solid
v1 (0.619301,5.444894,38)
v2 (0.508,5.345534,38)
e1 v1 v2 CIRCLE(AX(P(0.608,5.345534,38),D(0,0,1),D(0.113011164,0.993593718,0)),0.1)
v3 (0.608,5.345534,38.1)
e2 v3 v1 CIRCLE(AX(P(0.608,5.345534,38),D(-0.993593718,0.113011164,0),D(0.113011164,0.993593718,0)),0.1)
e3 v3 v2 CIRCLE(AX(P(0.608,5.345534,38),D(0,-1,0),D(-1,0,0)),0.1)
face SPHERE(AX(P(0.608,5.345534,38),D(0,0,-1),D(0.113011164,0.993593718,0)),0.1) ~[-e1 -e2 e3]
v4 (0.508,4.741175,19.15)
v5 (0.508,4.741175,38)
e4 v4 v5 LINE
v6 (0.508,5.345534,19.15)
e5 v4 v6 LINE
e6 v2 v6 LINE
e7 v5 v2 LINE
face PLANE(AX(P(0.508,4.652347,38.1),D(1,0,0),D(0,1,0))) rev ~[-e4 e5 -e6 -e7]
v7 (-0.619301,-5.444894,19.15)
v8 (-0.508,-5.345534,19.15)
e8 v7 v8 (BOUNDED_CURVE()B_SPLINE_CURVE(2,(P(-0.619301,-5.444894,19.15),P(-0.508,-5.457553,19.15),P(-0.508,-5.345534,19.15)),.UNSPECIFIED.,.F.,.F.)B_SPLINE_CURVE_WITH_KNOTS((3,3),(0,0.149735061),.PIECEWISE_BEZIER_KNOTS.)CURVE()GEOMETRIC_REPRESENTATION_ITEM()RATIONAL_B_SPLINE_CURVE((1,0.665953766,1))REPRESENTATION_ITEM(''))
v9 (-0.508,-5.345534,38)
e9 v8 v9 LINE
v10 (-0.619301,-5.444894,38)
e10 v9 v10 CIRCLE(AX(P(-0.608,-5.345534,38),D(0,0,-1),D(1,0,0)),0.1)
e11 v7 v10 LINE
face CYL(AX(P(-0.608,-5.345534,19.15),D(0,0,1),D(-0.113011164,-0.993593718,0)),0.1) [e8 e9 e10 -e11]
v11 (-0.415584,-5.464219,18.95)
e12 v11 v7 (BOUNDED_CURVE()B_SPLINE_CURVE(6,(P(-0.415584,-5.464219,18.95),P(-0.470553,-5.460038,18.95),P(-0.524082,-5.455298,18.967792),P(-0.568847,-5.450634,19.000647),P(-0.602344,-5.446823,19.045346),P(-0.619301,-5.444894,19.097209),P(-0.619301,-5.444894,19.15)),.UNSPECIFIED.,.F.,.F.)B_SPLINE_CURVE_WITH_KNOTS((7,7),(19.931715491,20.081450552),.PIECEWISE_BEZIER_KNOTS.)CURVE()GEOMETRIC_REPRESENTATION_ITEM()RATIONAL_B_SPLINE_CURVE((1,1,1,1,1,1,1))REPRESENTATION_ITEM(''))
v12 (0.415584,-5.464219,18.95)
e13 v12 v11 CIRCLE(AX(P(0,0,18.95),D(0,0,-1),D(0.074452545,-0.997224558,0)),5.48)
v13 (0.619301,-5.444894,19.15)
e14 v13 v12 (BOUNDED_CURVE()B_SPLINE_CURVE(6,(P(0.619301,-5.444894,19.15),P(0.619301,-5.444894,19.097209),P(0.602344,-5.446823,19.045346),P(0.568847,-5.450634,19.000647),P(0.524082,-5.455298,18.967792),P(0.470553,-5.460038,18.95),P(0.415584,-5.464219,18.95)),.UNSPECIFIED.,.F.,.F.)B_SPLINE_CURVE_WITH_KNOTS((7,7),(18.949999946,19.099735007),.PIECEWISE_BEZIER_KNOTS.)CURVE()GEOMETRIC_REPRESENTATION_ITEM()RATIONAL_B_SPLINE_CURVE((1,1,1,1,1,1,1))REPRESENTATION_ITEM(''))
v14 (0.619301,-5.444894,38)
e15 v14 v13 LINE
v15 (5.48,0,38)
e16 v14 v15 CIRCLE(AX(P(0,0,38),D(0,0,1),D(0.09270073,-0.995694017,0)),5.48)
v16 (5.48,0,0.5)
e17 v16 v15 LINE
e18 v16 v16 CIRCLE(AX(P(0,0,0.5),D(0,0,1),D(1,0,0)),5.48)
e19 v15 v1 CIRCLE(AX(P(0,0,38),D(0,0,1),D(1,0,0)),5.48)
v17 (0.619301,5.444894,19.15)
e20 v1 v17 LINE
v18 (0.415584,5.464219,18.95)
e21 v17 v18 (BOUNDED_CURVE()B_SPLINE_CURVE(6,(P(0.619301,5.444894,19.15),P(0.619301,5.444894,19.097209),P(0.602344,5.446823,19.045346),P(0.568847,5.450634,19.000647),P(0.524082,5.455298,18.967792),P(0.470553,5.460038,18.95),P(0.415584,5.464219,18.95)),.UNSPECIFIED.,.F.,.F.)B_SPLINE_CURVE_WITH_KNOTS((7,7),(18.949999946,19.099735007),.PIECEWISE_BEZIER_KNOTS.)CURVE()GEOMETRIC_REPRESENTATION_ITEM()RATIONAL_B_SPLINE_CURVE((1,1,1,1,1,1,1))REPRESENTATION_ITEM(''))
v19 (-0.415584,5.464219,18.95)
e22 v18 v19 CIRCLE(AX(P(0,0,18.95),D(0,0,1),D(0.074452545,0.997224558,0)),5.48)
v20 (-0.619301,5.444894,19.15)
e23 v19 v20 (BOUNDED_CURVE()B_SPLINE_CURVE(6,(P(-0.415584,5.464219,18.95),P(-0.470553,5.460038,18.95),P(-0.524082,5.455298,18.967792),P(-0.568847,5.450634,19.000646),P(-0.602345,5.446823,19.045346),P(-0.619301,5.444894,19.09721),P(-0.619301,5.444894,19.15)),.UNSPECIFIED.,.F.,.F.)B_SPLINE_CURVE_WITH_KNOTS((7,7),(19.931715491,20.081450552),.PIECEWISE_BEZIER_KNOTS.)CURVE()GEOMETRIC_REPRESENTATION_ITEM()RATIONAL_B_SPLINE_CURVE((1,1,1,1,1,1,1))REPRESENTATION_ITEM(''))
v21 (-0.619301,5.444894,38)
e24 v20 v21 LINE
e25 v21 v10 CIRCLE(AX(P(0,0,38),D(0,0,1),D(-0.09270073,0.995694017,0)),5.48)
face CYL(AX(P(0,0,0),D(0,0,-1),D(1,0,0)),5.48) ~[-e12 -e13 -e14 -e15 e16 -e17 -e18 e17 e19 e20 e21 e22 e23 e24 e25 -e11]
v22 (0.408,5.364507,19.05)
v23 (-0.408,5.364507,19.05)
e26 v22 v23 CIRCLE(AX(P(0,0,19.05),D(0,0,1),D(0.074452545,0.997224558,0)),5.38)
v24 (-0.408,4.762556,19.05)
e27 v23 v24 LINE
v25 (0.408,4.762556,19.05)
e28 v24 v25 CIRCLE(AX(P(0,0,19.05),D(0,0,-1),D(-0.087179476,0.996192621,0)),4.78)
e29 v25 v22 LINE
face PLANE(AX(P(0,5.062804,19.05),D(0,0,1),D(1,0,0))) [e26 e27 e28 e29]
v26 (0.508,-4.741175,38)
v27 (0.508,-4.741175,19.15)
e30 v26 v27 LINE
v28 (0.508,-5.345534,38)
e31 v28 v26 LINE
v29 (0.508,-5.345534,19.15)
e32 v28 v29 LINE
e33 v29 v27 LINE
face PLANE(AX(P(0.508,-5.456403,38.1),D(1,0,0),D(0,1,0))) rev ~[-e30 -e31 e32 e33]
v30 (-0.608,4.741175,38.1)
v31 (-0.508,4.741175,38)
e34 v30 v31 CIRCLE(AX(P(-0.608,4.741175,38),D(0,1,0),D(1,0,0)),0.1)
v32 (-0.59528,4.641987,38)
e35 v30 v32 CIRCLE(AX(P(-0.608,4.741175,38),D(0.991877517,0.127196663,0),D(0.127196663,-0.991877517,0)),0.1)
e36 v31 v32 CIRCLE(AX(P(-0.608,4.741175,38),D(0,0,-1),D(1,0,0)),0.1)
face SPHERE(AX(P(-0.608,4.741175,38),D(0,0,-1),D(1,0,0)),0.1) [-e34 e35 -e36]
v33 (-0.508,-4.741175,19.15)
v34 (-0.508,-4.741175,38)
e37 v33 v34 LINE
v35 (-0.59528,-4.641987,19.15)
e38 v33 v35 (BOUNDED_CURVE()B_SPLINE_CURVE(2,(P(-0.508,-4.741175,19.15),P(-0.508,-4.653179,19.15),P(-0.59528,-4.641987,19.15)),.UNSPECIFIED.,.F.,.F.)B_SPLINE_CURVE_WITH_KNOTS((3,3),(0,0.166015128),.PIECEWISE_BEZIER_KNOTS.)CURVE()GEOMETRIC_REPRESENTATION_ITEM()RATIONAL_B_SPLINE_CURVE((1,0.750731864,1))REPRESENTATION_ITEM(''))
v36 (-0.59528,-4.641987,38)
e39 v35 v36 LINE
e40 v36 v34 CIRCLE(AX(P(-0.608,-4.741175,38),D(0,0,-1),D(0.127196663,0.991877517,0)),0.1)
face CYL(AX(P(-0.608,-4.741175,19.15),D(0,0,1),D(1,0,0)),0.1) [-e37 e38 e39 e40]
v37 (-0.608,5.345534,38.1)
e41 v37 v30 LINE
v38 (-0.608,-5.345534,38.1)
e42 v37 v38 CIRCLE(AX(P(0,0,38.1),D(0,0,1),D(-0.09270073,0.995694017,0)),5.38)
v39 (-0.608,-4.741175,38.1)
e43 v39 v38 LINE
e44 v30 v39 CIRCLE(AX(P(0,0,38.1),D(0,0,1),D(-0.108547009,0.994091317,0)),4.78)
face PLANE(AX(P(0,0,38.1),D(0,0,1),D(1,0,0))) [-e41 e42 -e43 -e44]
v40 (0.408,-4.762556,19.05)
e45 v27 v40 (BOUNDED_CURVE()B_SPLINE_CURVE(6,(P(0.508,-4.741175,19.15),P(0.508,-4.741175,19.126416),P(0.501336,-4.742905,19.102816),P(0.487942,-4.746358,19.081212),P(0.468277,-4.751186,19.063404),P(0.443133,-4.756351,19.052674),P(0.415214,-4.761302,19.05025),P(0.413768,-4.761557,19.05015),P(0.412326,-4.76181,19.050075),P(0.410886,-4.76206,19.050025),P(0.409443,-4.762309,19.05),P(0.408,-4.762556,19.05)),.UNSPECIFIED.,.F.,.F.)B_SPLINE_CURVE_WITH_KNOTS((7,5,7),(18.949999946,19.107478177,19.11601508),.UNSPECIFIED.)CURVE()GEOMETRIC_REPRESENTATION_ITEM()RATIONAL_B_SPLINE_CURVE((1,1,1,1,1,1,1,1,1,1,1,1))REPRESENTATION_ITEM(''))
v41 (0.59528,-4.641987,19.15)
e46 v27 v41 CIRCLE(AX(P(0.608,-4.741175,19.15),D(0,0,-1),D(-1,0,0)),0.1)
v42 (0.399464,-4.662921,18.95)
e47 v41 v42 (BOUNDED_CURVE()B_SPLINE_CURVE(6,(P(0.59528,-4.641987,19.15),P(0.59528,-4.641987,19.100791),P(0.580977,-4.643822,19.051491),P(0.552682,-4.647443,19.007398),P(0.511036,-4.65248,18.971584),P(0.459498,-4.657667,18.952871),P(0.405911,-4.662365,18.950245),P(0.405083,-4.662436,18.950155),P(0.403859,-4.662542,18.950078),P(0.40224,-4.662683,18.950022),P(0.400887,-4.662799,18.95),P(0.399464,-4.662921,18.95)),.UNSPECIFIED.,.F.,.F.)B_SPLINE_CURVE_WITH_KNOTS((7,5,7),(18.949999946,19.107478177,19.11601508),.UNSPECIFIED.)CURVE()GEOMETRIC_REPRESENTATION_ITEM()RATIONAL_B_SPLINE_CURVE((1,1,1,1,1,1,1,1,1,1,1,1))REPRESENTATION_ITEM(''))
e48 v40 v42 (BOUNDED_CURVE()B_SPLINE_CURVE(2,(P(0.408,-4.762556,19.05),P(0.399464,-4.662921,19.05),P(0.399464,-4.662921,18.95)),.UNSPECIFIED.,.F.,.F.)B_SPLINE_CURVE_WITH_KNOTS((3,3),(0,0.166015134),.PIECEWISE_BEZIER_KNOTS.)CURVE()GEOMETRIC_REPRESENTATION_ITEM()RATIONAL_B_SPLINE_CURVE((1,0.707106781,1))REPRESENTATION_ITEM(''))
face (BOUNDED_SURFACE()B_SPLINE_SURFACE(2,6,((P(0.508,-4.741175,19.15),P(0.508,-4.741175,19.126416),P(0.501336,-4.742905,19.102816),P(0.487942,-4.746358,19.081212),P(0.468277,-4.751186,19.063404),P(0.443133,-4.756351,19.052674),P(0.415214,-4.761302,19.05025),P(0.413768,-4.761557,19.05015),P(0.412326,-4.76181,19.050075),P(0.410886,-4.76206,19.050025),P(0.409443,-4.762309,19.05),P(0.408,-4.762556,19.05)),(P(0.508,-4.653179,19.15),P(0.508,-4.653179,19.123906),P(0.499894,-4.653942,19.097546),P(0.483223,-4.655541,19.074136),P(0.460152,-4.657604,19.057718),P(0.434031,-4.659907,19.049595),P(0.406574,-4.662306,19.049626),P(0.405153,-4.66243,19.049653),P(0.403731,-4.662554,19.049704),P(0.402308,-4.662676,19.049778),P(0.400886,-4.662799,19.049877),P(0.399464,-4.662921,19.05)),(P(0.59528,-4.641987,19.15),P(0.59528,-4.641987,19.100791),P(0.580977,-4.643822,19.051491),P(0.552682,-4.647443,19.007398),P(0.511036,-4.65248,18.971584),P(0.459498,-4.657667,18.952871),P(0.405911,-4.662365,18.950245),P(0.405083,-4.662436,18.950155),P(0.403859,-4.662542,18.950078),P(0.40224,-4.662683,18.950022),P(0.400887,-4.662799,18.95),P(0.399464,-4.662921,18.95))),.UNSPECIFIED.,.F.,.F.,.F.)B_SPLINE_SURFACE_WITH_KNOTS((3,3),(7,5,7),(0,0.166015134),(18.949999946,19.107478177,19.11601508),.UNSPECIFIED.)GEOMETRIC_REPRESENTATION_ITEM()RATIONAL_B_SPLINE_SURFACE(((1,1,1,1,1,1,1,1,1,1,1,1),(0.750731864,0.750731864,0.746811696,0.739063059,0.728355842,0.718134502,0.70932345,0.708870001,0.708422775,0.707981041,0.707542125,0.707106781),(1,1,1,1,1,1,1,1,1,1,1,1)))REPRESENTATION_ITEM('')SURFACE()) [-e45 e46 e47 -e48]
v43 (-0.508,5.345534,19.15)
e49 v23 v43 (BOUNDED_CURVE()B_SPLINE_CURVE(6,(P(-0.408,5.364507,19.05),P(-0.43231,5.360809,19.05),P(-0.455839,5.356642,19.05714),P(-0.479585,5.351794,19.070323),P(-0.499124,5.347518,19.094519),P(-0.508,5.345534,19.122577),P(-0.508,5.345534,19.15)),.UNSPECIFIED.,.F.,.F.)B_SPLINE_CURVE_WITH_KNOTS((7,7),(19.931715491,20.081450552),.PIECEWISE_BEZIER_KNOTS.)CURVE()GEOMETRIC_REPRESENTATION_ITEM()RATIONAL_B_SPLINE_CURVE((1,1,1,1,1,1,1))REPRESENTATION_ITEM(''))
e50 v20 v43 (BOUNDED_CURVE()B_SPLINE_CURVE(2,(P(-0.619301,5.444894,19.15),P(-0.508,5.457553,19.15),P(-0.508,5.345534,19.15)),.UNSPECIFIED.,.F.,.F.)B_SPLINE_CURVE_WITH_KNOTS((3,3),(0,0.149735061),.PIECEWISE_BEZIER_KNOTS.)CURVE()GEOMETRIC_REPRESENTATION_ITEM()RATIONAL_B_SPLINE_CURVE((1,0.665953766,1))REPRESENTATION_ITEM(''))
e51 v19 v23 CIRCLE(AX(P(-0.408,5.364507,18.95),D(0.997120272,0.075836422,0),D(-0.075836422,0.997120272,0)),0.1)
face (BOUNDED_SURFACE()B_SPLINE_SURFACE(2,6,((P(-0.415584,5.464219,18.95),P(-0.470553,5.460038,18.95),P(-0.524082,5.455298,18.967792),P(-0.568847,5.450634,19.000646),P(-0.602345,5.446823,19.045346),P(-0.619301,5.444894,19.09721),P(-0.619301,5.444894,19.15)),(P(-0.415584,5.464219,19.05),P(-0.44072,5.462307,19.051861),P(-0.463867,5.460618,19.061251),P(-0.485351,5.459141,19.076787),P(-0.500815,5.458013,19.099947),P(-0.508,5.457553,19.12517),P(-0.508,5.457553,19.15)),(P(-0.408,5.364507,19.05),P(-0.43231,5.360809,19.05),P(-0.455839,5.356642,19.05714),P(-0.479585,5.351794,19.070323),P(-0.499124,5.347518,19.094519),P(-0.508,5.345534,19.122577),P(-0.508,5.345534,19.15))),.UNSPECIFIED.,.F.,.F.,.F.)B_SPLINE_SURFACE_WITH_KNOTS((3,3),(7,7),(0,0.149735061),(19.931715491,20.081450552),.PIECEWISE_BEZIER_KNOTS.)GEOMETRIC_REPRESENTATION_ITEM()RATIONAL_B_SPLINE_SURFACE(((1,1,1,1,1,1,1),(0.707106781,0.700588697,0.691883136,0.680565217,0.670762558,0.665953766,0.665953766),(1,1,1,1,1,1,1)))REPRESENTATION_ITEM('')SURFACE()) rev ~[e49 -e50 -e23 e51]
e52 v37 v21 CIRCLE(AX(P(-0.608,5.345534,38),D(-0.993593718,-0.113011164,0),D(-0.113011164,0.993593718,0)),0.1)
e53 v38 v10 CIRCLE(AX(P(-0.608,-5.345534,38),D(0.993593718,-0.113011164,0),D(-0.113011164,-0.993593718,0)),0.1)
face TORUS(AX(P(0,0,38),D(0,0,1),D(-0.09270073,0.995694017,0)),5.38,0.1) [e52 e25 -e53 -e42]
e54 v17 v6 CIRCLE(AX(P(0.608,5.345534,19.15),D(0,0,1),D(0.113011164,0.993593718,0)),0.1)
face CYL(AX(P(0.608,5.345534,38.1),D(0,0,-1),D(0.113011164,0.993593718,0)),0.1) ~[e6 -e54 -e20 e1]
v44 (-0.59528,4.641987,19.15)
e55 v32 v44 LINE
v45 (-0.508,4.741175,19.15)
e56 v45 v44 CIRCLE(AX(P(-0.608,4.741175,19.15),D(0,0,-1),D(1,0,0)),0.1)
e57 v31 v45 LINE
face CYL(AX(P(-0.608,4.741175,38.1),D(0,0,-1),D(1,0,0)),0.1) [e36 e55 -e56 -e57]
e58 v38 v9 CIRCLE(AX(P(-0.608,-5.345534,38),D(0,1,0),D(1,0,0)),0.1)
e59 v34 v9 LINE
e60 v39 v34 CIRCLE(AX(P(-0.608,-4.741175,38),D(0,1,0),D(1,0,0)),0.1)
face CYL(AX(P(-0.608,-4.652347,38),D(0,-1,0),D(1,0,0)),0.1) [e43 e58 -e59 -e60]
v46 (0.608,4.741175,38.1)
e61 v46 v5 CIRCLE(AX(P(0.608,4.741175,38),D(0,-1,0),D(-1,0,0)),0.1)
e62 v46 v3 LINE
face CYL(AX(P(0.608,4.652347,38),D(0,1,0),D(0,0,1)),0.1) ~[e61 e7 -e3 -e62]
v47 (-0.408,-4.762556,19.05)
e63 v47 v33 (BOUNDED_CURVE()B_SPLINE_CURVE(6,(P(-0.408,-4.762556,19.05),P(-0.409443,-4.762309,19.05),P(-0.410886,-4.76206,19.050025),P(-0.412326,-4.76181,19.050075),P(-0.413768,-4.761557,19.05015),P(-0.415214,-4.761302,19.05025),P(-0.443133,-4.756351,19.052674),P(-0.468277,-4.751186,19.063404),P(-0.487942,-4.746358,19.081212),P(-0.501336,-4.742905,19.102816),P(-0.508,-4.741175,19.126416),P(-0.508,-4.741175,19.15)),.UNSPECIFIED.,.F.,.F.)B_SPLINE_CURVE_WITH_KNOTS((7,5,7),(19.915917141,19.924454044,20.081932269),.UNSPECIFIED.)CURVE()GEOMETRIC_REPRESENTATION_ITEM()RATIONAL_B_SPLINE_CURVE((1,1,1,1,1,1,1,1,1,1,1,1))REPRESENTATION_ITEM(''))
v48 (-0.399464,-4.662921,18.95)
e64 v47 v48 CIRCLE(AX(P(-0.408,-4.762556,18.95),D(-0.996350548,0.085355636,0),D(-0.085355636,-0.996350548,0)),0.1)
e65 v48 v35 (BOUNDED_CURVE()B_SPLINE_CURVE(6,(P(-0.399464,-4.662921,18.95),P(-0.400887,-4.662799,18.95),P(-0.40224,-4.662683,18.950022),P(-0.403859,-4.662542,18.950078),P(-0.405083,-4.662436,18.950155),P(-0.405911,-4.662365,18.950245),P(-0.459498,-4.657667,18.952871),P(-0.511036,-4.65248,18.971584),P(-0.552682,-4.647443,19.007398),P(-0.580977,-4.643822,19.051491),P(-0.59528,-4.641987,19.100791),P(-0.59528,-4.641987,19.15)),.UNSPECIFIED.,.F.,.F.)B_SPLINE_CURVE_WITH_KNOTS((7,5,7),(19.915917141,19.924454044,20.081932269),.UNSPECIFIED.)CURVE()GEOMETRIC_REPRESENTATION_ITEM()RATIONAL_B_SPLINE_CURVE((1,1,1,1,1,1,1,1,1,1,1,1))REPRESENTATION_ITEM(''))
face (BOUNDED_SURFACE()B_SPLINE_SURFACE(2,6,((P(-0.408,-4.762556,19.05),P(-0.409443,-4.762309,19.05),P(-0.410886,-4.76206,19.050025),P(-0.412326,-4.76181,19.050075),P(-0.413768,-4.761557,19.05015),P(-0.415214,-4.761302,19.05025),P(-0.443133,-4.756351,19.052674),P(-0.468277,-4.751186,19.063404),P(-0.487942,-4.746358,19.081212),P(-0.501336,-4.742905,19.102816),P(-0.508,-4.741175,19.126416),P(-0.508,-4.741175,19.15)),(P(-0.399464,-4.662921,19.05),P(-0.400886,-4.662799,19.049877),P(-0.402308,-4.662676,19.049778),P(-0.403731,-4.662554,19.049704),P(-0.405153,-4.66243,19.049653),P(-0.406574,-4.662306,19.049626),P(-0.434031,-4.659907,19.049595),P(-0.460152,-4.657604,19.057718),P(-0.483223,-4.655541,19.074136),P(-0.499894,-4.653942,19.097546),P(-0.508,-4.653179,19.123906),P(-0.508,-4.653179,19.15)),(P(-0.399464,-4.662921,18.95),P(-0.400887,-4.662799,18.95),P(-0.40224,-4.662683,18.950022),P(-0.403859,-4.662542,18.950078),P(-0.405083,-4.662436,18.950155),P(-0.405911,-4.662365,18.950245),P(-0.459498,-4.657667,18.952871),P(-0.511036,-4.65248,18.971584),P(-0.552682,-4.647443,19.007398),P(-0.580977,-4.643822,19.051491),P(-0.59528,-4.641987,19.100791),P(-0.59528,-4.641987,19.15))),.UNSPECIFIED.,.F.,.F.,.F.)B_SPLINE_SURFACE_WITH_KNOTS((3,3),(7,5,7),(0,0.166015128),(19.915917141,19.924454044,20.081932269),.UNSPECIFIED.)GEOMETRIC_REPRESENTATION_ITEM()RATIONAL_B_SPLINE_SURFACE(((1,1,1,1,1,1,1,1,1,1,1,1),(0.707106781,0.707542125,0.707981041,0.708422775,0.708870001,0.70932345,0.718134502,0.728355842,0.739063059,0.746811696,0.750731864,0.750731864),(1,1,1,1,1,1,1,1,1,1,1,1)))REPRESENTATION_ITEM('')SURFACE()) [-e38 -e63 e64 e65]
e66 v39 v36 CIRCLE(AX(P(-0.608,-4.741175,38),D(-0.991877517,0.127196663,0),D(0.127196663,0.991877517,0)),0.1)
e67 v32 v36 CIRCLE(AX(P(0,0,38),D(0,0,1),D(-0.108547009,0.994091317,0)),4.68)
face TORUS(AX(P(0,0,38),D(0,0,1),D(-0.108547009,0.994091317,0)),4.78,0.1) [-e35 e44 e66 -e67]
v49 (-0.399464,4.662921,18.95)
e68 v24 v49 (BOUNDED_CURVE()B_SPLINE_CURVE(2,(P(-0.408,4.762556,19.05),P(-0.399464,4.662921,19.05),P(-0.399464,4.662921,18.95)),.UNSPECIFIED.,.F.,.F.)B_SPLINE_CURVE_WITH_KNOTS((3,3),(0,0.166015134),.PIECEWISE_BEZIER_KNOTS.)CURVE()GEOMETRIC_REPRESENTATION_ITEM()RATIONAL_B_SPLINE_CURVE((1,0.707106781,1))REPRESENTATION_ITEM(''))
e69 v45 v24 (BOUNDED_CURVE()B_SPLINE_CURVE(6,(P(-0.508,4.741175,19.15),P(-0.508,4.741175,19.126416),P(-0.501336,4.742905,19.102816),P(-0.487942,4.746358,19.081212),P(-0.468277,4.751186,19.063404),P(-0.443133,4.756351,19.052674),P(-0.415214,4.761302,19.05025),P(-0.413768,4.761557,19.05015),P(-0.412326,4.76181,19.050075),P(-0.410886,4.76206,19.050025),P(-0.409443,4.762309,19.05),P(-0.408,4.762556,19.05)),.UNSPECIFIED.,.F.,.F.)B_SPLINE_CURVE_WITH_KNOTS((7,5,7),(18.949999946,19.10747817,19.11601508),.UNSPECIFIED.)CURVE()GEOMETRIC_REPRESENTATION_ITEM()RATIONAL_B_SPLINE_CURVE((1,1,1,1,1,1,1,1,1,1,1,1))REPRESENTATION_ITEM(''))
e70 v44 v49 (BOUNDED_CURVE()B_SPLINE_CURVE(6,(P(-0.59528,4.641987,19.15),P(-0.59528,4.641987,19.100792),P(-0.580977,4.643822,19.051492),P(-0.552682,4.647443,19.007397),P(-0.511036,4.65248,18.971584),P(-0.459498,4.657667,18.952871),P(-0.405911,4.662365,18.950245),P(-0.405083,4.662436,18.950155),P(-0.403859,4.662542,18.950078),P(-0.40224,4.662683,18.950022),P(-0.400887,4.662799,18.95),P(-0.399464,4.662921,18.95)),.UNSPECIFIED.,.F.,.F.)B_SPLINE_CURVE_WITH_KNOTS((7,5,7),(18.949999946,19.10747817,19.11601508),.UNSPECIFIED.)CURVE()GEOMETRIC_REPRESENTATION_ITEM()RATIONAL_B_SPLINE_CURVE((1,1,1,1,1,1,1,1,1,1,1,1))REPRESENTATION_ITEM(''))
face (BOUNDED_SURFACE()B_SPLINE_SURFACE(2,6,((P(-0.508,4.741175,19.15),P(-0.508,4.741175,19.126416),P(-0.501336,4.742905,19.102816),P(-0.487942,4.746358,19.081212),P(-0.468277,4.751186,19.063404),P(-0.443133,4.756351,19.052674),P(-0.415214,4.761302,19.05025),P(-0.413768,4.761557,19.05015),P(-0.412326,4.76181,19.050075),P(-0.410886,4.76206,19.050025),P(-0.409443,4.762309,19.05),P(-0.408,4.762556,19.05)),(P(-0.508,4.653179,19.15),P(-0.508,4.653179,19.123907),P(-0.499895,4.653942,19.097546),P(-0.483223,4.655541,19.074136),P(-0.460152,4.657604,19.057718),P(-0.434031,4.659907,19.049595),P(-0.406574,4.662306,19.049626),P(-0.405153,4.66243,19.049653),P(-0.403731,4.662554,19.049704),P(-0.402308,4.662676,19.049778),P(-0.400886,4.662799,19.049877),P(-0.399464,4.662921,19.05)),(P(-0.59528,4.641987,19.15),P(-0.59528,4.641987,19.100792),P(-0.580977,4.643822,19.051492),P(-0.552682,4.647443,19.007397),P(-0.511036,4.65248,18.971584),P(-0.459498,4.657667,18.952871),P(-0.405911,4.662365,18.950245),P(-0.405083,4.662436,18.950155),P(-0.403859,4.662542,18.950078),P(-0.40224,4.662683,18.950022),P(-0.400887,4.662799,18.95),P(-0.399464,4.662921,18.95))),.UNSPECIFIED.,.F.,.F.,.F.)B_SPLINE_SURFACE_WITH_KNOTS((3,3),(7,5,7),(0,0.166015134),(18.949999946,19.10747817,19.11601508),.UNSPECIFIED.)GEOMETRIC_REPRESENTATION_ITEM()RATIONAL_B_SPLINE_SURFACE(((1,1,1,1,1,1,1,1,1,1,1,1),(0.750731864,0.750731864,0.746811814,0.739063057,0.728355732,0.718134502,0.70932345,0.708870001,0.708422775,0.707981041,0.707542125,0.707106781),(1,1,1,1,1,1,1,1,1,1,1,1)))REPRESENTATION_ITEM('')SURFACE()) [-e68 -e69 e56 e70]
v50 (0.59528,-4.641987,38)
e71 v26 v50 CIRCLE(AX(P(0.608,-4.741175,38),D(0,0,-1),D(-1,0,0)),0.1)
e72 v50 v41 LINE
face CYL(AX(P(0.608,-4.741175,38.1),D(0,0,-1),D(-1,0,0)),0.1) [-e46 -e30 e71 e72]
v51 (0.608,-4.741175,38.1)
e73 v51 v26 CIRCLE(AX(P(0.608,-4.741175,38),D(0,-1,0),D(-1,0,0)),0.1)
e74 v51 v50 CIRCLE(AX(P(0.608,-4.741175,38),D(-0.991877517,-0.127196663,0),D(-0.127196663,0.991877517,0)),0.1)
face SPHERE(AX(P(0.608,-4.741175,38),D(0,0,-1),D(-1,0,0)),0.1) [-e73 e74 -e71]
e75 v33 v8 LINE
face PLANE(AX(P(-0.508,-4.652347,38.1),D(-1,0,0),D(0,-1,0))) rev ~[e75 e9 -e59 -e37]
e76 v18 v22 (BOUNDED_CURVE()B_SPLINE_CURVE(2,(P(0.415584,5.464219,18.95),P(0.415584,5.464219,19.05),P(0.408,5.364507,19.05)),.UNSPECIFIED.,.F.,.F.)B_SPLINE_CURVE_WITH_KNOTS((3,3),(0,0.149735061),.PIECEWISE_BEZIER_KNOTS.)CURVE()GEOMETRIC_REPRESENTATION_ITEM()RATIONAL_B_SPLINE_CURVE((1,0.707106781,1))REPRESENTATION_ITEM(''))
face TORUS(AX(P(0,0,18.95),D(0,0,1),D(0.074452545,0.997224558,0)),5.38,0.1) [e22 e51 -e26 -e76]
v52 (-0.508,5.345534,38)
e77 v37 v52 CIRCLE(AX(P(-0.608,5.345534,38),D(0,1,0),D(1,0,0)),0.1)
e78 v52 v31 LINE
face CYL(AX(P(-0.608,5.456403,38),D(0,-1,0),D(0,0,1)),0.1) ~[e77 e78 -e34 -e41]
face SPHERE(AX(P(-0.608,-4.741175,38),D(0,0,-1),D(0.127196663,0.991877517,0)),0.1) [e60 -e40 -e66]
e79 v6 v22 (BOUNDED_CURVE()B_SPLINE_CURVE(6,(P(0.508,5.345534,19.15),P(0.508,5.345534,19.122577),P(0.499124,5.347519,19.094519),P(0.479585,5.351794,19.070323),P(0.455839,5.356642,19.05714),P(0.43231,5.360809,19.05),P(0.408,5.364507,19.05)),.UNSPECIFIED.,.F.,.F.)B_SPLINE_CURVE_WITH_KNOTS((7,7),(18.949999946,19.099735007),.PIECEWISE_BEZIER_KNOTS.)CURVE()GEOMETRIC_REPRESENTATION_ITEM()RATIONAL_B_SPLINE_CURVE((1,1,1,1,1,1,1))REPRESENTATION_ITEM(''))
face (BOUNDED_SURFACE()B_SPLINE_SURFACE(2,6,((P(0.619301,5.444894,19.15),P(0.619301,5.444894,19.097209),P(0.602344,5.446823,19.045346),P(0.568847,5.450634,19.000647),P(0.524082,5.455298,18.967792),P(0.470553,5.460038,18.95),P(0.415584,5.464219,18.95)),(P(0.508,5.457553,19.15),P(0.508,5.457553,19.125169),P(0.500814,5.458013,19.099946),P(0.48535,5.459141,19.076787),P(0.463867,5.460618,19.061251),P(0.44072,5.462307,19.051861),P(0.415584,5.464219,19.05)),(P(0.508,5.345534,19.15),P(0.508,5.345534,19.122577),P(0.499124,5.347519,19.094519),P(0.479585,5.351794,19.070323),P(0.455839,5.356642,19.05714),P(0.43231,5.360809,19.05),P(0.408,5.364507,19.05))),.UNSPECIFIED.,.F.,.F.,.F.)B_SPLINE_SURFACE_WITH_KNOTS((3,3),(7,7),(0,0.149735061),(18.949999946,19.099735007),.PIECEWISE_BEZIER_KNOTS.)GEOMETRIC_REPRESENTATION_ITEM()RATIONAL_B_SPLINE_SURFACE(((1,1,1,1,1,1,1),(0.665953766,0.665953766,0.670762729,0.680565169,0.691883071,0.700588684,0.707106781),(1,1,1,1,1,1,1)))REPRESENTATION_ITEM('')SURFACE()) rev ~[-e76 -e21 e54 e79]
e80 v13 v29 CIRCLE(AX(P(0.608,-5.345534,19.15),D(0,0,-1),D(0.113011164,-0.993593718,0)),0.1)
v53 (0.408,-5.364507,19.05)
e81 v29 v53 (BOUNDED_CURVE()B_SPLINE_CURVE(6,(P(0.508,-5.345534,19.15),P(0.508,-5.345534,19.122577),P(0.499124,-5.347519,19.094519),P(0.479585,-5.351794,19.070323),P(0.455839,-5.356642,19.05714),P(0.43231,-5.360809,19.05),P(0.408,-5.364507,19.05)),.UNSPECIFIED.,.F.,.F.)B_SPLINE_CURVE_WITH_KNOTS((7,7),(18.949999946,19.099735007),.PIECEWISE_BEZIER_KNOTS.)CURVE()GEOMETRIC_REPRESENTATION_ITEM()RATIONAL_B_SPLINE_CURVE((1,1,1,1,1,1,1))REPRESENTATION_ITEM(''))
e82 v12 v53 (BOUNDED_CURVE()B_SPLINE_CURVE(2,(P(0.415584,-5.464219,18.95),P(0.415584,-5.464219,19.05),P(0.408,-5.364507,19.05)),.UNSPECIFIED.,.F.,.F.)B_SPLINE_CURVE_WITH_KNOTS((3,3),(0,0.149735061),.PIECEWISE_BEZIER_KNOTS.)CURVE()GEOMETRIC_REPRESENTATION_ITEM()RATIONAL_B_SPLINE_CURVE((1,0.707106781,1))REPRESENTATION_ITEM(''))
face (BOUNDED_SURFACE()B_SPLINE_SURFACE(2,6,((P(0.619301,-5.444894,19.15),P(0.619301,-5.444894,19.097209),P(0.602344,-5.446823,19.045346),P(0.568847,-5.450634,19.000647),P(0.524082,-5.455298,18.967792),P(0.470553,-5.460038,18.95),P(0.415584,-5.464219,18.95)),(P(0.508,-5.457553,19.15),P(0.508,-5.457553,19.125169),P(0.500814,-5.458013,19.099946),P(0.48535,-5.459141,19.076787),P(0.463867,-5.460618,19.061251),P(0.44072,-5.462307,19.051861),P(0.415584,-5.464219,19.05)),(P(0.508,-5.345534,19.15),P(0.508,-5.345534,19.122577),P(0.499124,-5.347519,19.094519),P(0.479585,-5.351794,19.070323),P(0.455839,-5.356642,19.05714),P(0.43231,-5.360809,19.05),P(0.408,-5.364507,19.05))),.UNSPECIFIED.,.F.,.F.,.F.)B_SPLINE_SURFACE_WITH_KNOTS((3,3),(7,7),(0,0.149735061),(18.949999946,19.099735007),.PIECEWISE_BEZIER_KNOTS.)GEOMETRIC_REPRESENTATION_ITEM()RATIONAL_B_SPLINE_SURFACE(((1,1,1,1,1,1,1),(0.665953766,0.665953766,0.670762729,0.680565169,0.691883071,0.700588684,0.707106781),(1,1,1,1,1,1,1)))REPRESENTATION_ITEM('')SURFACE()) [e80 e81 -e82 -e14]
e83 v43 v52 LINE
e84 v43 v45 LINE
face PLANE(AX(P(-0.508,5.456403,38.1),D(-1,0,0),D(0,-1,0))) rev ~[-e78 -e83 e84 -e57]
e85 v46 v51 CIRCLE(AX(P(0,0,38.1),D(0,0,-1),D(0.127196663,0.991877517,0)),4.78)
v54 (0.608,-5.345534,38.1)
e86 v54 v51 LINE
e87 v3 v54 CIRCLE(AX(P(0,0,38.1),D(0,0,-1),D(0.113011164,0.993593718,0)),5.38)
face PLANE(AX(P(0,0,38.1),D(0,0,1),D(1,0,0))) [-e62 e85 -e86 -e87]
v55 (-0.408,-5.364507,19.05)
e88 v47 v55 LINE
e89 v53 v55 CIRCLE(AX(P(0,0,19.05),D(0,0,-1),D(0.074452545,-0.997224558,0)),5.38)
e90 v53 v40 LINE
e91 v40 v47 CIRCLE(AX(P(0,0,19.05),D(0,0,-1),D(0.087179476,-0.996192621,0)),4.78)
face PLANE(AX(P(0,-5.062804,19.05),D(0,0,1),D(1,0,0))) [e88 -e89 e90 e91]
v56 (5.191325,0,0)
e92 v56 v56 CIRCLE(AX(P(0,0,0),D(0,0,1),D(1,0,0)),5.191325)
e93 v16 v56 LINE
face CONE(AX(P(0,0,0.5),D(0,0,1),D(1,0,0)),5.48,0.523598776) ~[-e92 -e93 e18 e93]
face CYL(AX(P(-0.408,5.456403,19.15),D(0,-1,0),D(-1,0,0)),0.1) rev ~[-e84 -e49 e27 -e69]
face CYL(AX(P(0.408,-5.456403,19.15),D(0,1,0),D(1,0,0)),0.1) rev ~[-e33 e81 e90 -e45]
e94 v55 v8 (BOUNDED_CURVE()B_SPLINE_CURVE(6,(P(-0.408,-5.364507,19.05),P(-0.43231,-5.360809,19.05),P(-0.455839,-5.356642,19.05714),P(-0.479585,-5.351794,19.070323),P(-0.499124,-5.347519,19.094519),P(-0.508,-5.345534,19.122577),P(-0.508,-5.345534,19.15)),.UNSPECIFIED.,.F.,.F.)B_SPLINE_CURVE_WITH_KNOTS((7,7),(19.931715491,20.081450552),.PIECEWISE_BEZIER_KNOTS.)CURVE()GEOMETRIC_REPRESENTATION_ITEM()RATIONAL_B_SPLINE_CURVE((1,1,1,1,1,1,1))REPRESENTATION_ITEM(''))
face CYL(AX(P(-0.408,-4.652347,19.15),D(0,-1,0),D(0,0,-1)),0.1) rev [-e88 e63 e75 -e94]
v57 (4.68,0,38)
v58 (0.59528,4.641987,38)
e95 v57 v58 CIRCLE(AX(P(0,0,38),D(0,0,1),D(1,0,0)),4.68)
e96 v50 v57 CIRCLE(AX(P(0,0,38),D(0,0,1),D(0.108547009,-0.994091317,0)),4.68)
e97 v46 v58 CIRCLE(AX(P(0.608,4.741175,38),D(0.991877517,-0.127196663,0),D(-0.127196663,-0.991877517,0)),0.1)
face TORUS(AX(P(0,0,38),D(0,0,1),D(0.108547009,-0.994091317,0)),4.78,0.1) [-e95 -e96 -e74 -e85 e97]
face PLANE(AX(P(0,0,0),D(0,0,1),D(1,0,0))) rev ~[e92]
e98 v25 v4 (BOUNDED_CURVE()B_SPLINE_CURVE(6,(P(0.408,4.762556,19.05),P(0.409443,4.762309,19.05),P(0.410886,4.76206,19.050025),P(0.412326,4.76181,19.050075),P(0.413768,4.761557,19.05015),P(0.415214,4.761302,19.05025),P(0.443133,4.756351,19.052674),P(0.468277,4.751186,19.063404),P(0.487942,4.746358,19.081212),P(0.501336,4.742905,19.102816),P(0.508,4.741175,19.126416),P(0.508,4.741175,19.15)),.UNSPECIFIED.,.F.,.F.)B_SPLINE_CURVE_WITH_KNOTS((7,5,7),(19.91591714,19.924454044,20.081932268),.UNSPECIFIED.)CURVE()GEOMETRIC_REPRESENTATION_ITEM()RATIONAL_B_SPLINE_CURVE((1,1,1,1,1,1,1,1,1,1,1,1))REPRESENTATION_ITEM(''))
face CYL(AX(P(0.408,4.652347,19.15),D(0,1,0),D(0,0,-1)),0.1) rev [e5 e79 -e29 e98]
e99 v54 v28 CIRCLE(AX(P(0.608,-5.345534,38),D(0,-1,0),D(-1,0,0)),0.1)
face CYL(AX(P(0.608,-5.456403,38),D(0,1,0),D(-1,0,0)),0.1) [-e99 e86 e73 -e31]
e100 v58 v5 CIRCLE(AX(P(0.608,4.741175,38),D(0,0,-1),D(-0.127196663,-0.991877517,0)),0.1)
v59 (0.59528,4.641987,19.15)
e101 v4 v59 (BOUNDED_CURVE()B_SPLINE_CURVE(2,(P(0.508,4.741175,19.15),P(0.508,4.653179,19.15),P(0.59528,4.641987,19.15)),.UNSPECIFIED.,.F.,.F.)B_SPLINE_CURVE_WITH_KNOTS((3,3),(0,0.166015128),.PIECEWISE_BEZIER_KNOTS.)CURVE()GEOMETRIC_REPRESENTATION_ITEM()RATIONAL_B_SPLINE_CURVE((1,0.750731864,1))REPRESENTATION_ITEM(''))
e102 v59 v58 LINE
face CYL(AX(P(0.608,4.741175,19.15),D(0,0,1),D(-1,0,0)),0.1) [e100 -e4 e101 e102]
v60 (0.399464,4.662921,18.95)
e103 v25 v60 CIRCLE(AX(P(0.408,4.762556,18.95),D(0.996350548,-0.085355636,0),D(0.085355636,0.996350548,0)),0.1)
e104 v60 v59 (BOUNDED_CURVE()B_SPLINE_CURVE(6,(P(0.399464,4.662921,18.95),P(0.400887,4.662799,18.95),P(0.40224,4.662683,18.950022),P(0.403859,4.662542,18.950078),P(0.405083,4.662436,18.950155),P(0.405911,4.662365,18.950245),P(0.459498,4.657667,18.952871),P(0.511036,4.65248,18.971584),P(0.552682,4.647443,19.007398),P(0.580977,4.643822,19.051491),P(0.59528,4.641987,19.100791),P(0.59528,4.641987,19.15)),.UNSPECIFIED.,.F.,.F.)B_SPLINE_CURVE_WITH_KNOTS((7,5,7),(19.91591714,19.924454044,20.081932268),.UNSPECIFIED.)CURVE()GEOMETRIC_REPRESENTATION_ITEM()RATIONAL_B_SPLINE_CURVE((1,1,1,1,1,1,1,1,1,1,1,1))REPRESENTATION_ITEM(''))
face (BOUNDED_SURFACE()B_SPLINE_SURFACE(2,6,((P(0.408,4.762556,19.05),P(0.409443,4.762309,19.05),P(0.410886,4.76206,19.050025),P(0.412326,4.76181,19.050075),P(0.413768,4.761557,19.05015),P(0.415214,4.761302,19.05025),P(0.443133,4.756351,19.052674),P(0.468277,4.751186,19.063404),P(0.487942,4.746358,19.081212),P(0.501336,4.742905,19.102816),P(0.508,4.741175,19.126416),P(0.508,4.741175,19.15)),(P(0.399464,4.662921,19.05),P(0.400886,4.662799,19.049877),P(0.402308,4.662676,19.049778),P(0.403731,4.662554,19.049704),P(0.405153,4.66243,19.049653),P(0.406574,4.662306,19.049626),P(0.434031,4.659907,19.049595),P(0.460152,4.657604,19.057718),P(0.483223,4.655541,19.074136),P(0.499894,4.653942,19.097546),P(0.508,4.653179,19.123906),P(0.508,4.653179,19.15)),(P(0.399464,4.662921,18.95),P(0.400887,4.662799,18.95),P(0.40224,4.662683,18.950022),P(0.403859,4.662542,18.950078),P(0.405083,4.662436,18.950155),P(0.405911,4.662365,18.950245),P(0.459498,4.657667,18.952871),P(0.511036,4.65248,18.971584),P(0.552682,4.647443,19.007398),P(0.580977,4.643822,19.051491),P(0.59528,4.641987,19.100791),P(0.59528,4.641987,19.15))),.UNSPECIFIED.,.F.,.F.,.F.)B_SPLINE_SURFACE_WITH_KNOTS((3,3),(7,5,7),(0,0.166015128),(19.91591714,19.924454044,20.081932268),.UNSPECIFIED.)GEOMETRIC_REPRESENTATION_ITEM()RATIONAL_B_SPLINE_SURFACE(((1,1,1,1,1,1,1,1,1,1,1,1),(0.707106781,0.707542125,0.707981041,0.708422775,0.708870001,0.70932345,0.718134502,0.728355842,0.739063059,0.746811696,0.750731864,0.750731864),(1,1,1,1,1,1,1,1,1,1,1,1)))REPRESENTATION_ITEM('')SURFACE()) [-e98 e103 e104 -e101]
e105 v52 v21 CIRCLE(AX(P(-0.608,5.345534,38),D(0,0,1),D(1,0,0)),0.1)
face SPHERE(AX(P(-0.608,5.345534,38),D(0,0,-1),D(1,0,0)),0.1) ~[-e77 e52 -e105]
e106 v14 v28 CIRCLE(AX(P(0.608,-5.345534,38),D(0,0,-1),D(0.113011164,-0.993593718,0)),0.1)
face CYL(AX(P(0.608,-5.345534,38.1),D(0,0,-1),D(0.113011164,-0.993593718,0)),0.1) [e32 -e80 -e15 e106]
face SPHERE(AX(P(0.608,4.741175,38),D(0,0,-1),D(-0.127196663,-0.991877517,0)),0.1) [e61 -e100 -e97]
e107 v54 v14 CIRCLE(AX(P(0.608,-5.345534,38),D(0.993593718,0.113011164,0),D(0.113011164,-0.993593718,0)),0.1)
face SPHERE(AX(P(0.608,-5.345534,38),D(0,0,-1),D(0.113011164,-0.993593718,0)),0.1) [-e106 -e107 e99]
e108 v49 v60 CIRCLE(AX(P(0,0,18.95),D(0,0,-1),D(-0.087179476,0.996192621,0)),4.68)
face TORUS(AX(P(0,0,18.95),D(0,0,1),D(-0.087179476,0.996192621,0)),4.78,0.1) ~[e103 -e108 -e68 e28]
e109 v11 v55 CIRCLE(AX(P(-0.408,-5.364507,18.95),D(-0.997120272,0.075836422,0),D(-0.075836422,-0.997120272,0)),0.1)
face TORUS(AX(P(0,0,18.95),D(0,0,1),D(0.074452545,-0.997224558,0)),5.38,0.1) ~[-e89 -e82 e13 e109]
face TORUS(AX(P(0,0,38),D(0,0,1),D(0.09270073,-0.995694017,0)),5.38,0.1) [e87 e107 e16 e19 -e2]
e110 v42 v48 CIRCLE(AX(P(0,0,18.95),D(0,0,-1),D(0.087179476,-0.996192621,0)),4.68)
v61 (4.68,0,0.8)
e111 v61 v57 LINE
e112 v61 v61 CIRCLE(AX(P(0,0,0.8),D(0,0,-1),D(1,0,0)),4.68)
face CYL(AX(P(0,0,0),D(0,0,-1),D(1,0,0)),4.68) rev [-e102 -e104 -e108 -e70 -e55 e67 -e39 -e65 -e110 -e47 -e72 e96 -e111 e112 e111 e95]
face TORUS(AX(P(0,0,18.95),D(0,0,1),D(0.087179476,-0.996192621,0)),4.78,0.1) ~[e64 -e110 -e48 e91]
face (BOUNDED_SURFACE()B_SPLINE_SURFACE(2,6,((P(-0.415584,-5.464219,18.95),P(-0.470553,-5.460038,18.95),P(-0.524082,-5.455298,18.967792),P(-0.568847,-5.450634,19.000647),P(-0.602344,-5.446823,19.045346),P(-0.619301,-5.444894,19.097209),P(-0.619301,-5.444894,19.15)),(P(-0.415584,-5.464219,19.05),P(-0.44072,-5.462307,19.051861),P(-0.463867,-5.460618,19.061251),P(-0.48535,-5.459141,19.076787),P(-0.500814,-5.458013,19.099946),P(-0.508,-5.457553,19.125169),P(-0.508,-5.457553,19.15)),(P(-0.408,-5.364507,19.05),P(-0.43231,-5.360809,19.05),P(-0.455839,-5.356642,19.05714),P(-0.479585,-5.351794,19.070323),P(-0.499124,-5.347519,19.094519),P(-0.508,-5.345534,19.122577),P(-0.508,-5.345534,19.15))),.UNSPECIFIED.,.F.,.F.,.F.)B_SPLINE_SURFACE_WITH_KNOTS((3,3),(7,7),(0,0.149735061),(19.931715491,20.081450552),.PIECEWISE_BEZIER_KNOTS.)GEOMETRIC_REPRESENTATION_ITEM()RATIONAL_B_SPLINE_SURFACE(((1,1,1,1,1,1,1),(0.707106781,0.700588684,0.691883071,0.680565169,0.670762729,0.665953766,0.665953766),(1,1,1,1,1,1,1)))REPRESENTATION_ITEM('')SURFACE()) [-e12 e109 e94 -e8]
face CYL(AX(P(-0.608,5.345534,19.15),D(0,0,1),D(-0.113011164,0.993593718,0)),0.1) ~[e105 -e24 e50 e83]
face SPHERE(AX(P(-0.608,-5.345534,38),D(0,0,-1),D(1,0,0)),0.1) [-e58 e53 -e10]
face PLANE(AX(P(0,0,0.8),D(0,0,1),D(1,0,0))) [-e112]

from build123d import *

# Parameters (mm, degrees)
F0_R     = 5.48
F1_DEPTH = 38.1
F2_T     = -0.8
F4_DEPTH = 19.05
F5_F1_R  = 0.100000054
F5_F2_R  = 0.100000054
F6_SIZE2 = 0.2886751346
F6_SIZE  = 0.5


with BuildPart() as f1:
    # F0 (on Top) → F1 (new body)
    with BuildSketch(Plane.XY):
        Circle(F0_R)
    extrude(amount=F1_DEPTH)

    # F2
    f2_openings = [f1.faces().sort_by_distance(p)[0] for p in [
        (0, 0, 38.1),
    ]]
    offset(amount=F2_T, openings=f2_openings)

    # F3 (on face) → F4 (cut)
    with BuildSketch(Plane.XY.offset(38.1)):
        with BuildLine():
            Line((0.508, 4.6523473645), (0.508, 5.4564032109))
            ThreePointArc((0.508, 5.4564032109), (0, 5.48), (-0.508, 5.4564032109))
            Line((-0.508, 5.4564032109), (-0.508, 4.6523473645))
            ThreePointArc((-0.508, 4.6523473645), (0, 4.68), (0.508, 4.6523473645))
        make_face()
        with BuildLine():
            Line((0.508, -5.4564032109), (0.508, -4.6523473645))
            ThreePointArc((0.508, -4.6523473645), (0, -4.68), (-0.508, -4.6523473645))
            Line((-0.508, -4.6523473645), (-0.508, -5.4564032109))
            ThreePointArc((-0.508, -5.4564032109), (0, -5.48), (0.508, -5.4564032109))
        make_face()
    extrude(amount=-F4_DEPTH, mode=Mode.SUBTRACT)

    # F5: fillet of radius 0.100000054 on 20 edges, made by hand

    # F5_f1
    f5_f1_edges = [f1.edges().sort_by_distance(p)[0] for p in [
        (0.508, -5.0543752877, 19.05),
        (-0.508, -5.0543752877, 19.05),
        (-0.508, 5.0543752877, 19.05),
        (0.508, 5.0543752877, 19.05),
    ]]
    fillet(f5_f1_edges, radius=F5_F1_R)

    # F5_f2
    f5_f2_edges = [f1.edges().sort_by_distance(p)[0] for p in [
        (-0.508, 5.0543752877, 38.1),
        (-4.68, 0, 38.1),
        (-0.508, -5.0543752877, 38.1),
        (-5.48, 0, 38.1),
        (4.0505703302, -3.6909727715, 38.1),
        (0.508, -5.0543752877, 38.1),
        (3.4842387978, -3.1244967595, 38.1),
        (3.4842387978, 3.1244967595, 38.1),
        (0.508, 5.0543752877, 38.1),
        (4.0505703302, 3.6909727715, 38.1),
        (0.508, -5.4564032109, 28.625000027),
        (0.508, -4.6523473645, 28.625000027),
        (-0.508, -4.6523473645, 28.625000027),
        (-0.508, -5.4564032109, 28.625000027),
        (0, 4.68, 19.05),
        (0, 5.48, 19.05),
        (0.4787933813, 5.4590435891, 19.0793721529),
        (-0.4787933846, 5.4590435887, 19.0793721564),
        (-0.4787918965, 4.6554439453, 19.0793706648),
        (0.4787918943, 4.6554439457, 19.0793706623),
        (-0.4787933813, -5.4590435891, 19.0793721529),
        (-0.4787918943, -4.6554439457, 19.0793706623),
        (0.4787918943, -4.6554439457, 19.0793706623),
        (0.4787933813, -5.4590435891, 19.0793721529),
    ]]
    fillet(f5_f2_edges, radius=F5_F2_R)

    # F6
    f6_edges = [f1.edges().sort_by_distance(p)[0] for p in [
        (-5.48, 0, 0),
    ]]
    f6_side = f1.faces().sort_by_distance((-5.48, 0, 19))[0]
    chamfer(f6_edges, length=F6_SIZE, length2=F6_SIZE2, reference=f6_side)


solid = f1.part
